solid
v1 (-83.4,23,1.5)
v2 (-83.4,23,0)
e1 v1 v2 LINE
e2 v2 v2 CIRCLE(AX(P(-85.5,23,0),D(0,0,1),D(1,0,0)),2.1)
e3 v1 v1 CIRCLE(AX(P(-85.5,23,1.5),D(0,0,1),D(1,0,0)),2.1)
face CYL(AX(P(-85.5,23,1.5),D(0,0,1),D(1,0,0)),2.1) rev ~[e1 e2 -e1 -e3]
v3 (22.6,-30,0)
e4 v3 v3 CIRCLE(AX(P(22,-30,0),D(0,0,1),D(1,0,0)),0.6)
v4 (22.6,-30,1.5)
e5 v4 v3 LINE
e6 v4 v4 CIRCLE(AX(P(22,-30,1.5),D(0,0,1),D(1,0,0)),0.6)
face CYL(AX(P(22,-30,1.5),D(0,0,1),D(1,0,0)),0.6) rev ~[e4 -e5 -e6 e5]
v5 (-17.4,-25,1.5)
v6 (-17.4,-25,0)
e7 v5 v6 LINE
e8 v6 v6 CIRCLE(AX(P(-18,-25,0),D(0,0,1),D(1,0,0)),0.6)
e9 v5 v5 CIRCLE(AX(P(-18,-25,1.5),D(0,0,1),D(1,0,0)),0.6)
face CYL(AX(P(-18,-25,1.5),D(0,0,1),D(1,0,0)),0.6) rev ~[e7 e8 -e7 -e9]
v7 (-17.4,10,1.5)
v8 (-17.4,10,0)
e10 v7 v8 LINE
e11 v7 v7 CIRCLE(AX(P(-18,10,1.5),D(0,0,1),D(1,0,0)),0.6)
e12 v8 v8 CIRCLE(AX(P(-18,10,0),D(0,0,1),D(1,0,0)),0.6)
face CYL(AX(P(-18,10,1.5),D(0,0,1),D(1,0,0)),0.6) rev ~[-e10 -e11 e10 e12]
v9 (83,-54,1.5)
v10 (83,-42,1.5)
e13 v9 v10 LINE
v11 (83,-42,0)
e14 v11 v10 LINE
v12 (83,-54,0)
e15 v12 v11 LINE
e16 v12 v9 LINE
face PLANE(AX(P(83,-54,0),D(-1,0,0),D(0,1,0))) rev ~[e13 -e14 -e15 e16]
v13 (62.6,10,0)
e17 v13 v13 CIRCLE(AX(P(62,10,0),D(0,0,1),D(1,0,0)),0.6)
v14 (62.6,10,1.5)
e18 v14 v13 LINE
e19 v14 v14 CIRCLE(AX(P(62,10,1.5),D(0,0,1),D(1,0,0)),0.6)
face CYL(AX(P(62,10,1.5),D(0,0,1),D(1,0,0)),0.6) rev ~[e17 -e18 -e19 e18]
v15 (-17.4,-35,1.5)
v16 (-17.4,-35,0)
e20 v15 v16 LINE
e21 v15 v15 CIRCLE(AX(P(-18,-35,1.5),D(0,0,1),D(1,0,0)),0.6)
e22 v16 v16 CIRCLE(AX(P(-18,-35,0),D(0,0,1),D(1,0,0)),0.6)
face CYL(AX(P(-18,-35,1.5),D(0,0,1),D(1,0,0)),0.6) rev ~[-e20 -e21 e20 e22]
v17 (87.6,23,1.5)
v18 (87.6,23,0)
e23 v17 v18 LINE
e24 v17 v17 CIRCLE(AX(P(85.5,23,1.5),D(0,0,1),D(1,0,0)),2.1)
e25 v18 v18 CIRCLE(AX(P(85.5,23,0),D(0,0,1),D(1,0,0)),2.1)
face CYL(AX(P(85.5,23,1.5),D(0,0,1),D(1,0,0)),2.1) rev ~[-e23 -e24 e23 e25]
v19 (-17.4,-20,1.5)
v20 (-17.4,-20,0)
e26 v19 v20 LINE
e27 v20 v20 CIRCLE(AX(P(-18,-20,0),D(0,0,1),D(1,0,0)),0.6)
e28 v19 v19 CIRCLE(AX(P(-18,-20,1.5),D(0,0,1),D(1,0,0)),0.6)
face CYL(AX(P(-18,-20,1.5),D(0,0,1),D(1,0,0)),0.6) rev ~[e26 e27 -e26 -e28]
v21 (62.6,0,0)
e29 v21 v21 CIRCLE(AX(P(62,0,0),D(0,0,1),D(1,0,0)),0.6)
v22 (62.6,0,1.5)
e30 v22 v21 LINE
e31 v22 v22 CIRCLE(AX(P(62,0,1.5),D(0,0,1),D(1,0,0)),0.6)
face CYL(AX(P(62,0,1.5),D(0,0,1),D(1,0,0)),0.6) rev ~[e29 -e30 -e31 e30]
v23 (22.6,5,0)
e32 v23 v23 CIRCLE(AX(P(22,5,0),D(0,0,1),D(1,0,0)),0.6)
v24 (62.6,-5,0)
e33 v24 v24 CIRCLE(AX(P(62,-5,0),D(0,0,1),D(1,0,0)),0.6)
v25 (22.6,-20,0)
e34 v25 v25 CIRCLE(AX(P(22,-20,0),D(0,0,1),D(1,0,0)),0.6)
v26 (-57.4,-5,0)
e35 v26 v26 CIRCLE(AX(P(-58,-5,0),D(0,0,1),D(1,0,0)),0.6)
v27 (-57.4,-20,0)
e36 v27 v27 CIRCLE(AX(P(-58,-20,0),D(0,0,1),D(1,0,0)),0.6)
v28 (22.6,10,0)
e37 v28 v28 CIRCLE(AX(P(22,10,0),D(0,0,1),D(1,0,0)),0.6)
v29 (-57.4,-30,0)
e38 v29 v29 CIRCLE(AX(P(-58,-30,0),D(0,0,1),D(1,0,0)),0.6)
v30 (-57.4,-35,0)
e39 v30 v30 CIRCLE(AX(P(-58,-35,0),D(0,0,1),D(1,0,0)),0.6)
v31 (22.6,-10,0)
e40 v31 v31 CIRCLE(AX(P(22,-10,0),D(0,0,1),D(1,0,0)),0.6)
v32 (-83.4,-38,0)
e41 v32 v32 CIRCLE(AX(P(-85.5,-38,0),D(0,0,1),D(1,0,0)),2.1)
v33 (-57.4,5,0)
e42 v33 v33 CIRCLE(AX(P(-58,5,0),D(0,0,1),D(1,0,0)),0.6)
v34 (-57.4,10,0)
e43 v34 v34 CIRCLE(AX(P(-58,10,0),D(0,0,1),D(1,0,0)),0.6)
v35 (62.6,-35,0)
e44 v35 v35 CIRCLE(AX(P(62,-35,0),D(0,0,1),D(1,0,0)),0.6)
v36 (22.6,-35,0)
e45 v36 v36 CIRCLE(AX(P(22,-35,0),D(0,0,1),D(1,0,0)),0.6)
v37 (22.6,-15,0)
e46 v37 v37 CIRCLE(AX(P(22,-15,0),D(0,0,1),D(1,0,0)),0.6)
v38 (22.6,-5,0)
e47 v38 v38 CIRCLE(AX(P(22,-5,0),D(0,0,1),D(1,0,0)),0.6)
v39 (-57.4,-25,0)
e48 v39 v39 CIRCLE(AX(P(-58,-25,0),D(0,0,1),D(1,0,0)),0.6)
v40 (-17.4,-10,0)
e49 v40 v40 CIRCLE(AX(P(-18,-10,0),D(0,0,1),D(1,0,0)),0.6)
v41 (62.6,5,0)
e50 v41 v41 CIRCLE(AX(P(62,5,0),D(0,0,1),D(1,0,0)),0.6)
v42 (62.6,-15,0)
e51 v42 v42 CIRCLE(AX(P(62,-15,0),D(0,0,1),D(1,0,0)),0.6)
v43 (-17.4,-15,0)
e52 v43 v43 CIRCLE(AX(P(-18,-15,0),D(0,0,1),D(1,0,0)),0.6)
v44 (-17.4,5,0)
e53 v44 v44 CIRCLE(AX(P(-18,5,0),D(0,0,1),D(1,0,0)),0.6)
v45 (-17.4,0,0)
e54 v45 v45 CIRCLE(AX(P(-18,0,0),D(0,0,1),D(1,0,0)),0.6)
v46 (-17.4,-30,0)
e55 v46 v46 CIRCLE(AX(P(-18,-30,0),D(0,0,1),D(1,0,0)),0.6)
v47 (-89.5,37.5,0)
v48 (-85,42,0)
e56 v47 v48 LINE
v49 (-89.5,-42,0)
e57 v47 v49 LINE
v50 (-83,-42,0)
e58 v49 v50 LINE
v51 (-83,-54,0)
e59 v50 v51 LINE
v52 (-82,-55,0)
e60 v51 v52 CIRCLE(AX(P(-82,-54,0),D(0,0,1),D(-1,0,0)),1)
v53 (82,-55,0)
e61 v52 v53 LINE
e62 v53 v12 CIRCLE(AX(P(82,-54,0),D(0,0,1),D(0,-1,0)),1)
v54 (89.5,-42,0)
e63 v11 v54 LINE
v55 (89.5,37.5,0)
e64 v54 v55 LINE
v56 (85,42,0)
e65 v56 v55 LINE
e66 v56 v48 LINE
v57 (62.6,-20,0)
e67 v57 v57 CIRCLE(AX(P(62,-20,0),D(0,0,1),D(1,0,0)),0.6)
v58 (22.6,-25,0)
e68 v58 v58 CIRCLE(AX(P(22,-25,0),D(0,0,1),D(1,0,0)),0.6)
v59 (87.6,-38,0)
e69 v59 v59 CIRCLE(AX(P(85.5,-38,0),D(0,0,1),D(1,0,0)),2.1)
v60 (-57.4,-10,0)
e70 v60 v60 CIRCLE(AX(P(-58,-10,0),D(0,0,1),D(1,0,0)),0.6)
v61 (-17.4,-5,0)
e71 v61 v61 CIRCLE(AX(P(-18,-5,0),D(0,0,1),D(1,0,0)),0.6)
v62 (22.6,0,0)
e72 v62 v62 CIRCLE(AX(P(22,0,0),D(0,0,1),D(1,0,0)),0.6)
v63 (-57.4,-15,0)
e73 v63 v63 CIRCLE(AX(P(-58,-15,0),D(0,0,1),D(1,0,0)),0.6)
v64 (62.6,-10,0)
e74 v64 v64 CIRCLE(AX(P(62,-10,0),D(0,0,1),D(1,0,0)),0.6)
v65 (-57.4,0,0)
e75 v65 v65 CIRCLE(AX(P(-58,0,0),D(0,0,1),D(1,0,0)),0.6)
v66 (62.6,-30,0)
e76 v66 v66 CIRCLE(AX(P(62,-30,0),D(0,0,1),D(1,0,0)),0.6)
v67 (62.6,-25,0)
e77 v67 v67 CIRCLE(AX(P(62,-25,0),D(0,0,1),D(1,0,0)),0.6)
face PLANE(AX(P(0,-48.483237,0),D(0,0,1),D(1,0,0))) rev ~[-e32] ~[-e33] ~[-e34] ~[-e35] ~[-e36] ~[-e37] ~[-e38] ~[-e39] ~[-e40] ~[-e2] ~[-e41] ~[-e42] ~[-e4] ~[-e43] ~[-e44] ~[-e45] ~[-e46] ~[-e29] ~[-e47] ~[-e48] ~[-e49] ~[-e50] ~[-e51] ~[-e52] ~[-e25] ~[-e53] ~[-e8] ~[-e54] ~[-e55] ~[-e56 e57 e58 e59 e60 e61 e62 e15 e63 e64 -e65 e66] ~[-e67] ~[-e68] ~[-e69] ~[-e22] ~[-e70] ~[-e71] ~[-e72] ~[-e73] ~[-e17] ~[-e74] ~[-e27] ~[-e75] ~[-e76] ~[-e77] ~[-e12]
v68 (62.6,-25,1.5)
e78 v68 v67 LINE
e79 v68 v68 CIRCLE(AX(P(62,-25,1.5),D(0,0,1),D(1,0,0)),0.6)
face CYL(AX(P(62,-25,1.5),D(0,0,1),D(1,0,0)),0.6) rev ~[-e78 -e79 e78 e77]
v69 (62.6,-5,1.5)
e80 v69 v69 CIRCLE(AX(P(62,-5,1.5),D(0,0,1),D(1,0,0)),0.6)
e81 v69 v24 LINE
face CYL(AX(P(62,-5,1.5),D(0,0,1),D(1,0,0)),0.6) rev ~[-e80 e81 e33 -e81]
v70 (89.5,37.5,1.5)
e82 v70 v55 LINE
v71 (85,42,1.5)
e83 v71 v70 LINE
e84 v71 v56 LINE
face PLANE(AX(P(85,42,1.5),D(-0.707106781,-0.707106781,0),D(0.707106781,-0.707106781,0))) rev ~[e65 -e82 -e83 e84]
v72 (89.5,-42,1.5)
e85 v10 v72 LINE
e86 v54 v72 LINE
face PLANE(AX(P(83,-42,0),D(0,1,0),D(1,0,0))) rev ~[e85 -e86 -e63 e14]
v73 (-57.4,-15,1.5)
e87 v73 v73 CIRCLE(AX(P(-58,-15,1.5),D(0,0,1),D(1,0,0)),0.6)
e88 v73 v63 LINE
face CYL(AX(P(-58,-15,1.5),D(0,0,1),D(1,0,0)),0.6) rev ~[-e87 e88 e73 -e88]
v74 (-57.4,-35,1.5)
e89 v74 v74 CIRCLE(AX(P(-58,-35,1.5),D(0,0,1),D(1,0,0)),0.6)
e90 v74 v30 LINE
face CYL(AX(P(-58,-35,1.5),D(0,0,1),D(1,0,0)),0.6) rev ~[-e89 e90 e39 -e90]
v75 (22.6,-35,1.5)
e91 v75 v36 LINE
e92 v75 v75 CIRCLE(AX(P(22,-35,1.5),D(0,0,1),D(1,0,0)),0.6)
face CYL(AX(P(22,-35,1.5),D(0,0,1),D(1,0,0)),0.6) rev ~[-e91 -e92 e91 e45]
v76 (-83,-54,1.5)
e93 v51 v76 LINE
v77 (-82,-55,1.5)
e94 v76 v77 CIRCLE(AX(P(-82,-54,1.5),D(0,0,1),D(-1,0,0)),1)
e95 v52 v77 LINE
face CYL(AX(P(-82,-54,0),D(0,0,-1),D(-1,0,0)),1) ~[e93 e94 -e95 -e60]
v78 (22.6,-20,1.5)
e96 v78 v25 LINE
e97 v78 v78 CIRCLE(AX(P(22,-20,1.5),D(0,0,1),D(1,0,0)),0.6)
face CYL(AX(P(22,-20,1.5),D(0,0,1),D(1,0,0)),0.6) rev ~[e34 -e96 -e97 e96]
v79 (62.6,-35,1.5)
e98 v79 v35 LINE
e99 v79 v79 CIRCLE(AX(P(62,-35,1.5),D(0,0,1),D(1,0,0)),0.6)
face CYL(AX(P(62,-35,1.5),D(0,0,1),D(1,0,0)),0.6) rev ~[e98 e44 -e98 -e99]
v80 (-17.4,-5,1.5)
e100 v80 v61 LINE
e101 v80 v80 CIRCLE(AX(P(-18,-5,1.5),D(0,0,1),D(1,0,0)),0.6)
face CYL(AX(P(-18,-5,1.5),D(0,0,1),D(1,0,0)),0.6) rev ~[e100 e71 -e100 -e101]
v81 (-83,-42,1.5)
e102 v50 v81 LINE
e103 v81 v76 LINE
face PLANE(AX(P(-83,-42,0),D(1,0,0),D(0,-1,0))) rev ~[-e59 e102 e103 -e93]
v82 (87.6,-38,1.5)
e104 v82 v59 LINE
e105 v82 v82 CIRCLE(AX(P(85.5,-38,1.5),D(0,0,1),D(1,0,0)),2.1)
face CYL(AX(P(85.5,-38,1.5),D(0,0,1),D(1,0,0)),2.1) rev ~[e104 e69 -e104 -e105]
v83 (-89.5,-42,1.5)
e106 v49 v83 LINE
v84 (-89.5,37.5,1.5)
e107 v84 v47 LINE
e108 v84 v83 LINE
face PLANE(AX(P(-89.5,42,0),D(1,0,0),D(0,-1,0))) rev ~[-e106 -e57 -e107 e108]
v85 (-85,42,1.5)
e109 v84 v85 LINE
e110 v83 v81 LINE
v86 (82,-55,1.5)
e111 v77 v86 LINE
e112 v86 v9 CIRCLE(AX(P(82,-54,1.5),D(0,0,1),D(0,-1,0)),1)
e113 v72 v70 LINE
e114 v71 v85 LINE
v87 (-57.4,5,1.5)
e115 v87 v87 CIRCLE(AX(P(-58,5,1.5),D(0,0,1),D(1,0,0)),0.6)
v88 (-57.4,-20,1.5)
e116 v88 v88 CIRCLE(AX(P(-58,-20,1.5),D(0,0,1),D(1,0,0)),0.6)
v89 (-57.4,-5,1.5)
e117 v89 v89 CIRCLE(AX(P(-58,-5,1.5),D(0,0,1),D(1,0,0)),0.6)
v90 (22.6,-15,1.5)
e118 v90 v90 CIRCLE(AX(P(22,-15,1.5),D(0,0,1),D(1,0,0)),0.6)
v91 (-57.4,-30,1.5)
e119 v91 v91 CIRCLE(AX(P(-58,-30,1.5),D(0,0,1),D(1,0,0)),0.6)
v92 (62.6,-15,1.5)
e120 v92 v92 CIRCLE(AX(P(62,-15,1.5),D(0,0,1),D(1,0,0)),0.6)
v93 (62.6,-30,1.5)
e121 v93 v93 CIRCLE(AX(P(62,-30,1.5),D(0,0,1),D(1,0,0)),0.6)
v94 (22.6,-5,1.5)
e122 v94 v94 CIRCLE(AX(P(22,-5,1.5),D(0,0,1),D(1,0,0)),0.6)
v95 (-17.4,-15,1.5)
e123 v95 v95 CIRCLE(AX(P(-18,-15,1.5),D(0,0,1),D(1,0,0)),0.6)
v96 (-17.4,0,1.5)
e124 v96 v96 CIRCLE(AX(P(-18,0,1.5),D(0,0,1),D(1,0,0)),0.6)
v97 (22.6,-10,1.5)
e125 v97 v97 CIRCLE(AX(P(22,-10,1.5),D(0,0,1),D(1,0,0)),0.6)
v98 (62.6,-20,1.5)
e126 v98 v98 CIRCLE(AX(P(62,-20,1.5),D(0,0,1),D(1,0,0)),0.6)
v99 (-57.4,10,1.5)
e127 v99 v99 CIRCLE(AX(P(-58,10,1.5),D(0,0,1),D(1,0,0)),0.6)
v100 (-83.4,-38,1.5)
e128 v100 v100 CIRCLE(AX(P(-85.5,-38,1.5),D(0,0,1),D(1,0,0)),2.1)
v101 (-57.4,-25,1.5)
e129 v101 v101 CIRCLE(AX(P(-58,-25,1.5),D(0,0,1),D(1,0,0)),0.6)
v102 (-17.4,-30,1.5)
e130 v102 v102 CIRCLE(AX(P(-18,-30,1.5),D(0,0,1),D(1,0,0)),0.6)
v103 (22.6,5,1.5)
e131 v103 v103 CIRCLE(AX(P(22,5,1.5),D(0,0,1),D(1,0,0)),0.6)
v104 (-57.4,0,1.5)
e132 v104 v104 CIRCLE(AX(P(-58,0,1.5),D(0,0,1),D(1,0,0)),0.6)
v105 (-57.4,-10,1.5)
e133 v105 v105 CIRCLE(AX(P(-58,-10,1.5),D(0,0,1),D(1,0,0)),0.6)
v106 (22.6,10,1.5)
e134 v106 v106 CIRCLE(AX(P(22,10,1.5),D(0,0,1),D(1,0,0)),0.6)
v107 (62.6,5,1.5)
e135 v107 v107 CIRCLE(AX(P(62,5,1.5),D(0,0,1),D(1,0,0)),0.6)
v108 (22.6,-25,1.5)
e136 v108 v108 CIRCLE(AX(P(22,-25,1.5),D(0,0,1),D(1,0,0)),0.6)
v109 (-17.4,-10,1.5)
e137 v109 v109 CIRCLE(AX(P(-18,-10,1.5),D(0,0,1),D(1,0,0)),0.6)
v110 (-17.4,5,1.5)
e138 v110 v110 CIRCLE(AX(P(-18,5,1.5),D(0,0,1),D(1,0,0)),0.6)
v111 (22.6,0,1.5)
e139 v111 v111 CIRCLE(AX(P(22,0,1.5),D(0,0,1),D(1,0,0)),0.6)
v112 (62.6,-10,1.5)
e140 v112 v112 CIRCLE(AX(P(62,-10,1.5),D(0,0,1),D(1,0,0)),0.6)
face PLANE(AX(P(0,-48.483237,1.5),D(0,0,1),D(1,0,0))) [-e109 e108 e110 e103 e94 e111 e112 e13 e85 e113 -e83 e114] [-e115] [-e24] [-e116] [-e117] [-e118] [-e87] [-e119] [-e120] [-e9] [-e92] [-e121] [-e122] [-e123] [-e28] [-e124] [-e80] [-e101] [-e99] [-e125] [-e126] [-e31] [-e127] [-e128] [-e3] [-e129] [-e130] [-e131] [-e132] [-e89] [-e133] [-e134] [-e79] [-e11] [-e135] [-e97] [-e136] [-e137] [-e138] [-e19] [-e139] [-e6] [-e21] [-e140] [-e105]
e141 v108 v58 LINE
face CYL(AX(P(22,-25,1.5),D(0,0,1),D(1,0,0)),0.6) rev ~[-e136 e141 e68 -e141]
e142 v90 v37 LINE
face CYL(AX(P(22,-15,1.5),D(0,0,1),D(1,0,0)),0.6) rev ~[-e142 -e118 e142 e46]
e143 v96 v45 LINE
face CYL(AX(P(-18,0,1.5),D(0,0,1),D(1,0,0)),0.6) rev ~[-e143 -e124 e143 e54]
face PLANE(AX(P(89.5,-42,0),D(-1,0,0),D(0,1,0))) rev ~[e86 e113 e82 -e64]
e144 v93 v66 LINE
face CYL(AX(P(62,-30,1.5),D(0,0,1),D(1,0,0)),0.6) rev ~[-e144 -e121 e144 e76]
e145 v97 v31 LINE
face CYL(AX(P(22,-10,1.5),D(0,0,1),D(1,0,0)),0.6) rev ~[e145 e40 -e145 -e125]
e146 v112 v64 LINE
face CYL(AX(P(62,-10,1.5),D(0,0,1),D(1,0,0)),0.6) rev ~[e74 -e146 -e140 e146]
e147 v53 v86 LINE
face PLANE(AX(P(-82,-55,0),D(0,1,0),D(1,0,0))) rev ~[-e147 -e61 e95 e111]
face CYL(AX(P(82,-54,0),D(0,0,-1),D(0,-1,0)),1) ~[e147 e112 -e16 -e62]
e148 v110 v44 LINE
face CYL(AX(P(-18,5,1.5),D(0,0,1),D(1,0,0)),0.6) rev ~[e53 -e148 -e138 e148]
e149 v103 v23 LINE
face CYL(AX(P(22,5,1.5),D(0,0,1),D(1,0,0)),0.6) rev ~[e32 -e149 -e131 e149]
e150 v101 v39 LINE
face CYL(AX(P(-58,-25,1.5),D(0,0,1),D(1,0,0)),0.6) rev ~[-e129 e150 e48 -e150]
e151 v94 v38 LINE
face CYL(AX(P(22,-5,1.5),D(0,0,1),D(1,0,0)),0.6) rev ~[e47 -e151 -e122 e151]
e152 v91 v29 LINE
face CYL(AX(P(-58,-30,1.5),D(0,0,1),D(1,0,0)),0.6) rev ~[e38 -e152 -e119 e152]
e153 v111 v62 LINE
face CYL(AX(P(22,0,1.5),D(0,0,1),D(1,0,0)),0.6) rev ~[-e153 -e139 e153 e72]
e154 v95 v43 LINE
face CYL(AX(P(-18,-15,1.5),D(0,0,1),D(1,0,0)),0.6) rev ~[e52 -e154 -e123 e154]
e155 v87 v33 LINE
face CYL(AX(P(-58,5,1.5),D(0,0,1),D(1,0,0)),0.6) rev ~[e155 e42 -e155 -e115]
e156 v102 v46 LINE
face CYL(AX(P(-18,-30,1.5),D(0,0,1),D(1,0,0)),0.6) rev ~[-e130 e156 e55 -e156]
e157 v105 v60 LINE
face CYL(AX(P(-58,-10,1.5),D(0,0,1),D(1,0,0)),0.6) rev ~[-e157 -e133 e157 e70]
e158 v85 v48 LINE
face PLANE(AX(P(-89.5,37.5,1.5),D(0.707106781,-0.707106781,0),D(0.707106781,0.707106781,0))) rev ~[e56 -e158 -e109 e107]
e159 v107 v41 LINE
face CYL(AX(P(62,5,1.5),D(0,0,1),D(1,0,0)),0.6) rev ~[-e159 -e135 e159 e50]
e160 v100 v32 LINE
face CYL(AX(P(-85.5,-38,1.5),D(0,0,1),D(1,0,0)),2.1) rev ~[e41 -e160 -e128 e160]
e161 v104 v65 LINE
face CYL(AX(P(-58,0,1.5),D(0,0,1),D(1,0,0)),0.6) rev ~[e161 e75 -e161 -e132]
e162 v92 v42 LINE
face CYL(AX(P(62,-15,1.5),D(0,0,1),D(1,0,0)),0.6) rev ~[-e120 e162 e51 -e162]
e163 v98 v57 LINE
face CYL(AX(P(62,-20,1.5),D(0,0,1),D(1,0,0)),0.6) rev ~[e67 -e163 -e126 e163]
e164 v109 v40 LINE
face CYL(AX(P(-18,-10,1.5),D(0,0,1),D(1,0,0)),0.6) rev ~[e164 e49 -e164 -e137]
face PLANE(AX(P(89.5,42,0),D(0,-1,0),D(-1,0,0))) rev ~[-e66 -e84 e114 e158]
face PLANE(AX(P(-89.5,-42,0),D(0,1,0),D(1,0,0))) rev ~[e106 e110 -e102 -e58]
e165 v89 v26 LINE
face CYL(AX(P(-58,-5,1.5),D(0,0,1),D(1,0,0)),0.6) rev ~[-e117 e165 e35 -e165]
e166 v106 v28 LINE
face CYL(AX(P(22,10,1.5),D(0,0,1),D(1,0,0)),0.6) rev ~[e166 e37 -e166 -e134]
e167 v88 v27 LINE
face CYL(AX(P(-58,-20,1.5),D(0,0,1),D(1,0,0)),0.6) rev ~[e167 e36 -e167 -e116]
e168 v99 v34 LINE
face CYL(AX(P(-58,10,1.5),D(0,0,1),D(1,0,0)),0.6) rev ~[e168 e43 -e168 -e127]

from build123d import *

# Parameters (mm, degrees)
F1_DEPTH = 1.5
F2_R     = 2.1
F2_R_2   = 0.6
F3_DEPTH = 1.501


# Not quite as in the source:
# - a feature names something its author has since deleted; it is built from what else it names


with BuildPart() as f1:
    # F0 (on Top) → F1 (new body)
    with BuildSketch(Plane.XY):
        with BuildLine():
            Line((83, -42), (-83, -42))
            Line((-83, -42), (-83, -54))
            ThreePointArc((-83, -54), (-82.7071067812, -54.7071067812), (-82, -55))
            Line((-82, -55), (82, -55))
            ThreePointArc((82, -55), (82.7071067812, -54.7071067812), (83, -54))
            Line((83, -54), (83, -42))
        make_face()
        Polygon((89.5, 42), (-89.5, 42), (-89.5, -42), (-83, -42), (83, -42), (89.5, -42), align=None)
    extrude(amount=F1_DEPTH)

    # F2 (on face) → F3 (cut, through all)
    with BuildSketch(Plane.XY.offset(1.5)):
        with Locations((-85.5, -38)):
            Circle(F2_R)
        with Locations((-85.5, 23)):
            Circle(F2_R)
        Polygon((-89.5, 42), (-89.5, 37.5), (-85, 42), align=None)
        with Locations((85.5, -38)):
            Circle(F2_R)
        Polygon((89.5, 42), (85, 42), (89.5, 37.5), align=None)
        with Locations((85.5, 23)):
            Circle(F2_R)
        with Locations((-58, -35)):
            Circle(F2_R_2)
        with Locations((-58, -30)):
            Circle(F2_R_2)
        with Locations((-58, -25)):
            Circle(F2_R_2)
        with Locations((-58, -20)):
            Circle(F2_R_2)
        with Locations((-58, -15)):
            Circle(F2_R_2)
        with Locations((-58, -10)):
            Circle(F2_R_2)
        with Locations((-58, -5)):
            Circle(F2_R_2)
        with Locations((-58, 0)):
            Circle(F2_R_2)
        with Locations((-58, 5)):
            Circle(F2_R_2)
        with Locations((-58, 10)):
            Circle(F2_R_2)
        with Locations((-18, 10)):
            Circle(F2_R_2)
        with Locations((-18, 5)):
            Circle(F2_R_2)
        with Locations((-18, 0)):
            Circle(F2_R_2)
        with Locations((-18, -5)):
            Circle(F2_R_2)
        with Locations((-18, -10)):
            Circle(F2_R_2)
        with Locations((-18, -15)):
            Circle(F2_R_2)
        with Locations((-18, -20)):
            Circle(F2_R_2)
        with Locations((-18, -25)):
            Circle(F2_R_2)
        with Locations((-18, -30)):
            Circle(F2_R_2)
        with Locations((-18, -35)):
            Circle(F2_R_2)
        with Locations((22, -35)):
            Circle(F2_R_2)
        with Locations((22, -30)):
            Circle(F2_R_2)
        with Locations((22, -25)):
            Circle(F2_R_2)
        with Locations((22, -20)):
            Circle(F2_R_2)
        with Locations((22, -15)):
            Circle(F2_R_2)
        with Locations((22, -10)):
            Circle(F2_R_2)
        with Locations((22, -5)):
            Circle(F2_R_2)
        with Locations((22, 0)):
            Circle(F2_R_2)
        with Locations((22, 5)):
            Circle(F2_R_2)
        with Locations((22, 10)):
            Circle(F2_R_2)
        with Locations((62, 10)):
            Circle(F2_R_2)
        with Locations((62, 5)):
            Circle(F2_R_2)
        with Locations((62, 0)):
            Circle(F2_R_2)
        with Locations((62, -5)):
            Circle(F2_R_2)
        with Locations((62, -10)):
            Circle(F2_R_2)
        with Locations((62, -15)):
            Circle(F2_R_2)
        with Locations((62, -20)):
            Circle(F2_R_2)
        with Locations((62, -25)):
            Circle(F2_R_2)
        with Locations((62, -30)):
            Circle(F2_R_2)
        with Locations((62, -35)):
            Circle(F2_R_2)
    extrude(amount=-F3_DEPTH, mode=Mode.SUBTRACT)


solid = f1.part
